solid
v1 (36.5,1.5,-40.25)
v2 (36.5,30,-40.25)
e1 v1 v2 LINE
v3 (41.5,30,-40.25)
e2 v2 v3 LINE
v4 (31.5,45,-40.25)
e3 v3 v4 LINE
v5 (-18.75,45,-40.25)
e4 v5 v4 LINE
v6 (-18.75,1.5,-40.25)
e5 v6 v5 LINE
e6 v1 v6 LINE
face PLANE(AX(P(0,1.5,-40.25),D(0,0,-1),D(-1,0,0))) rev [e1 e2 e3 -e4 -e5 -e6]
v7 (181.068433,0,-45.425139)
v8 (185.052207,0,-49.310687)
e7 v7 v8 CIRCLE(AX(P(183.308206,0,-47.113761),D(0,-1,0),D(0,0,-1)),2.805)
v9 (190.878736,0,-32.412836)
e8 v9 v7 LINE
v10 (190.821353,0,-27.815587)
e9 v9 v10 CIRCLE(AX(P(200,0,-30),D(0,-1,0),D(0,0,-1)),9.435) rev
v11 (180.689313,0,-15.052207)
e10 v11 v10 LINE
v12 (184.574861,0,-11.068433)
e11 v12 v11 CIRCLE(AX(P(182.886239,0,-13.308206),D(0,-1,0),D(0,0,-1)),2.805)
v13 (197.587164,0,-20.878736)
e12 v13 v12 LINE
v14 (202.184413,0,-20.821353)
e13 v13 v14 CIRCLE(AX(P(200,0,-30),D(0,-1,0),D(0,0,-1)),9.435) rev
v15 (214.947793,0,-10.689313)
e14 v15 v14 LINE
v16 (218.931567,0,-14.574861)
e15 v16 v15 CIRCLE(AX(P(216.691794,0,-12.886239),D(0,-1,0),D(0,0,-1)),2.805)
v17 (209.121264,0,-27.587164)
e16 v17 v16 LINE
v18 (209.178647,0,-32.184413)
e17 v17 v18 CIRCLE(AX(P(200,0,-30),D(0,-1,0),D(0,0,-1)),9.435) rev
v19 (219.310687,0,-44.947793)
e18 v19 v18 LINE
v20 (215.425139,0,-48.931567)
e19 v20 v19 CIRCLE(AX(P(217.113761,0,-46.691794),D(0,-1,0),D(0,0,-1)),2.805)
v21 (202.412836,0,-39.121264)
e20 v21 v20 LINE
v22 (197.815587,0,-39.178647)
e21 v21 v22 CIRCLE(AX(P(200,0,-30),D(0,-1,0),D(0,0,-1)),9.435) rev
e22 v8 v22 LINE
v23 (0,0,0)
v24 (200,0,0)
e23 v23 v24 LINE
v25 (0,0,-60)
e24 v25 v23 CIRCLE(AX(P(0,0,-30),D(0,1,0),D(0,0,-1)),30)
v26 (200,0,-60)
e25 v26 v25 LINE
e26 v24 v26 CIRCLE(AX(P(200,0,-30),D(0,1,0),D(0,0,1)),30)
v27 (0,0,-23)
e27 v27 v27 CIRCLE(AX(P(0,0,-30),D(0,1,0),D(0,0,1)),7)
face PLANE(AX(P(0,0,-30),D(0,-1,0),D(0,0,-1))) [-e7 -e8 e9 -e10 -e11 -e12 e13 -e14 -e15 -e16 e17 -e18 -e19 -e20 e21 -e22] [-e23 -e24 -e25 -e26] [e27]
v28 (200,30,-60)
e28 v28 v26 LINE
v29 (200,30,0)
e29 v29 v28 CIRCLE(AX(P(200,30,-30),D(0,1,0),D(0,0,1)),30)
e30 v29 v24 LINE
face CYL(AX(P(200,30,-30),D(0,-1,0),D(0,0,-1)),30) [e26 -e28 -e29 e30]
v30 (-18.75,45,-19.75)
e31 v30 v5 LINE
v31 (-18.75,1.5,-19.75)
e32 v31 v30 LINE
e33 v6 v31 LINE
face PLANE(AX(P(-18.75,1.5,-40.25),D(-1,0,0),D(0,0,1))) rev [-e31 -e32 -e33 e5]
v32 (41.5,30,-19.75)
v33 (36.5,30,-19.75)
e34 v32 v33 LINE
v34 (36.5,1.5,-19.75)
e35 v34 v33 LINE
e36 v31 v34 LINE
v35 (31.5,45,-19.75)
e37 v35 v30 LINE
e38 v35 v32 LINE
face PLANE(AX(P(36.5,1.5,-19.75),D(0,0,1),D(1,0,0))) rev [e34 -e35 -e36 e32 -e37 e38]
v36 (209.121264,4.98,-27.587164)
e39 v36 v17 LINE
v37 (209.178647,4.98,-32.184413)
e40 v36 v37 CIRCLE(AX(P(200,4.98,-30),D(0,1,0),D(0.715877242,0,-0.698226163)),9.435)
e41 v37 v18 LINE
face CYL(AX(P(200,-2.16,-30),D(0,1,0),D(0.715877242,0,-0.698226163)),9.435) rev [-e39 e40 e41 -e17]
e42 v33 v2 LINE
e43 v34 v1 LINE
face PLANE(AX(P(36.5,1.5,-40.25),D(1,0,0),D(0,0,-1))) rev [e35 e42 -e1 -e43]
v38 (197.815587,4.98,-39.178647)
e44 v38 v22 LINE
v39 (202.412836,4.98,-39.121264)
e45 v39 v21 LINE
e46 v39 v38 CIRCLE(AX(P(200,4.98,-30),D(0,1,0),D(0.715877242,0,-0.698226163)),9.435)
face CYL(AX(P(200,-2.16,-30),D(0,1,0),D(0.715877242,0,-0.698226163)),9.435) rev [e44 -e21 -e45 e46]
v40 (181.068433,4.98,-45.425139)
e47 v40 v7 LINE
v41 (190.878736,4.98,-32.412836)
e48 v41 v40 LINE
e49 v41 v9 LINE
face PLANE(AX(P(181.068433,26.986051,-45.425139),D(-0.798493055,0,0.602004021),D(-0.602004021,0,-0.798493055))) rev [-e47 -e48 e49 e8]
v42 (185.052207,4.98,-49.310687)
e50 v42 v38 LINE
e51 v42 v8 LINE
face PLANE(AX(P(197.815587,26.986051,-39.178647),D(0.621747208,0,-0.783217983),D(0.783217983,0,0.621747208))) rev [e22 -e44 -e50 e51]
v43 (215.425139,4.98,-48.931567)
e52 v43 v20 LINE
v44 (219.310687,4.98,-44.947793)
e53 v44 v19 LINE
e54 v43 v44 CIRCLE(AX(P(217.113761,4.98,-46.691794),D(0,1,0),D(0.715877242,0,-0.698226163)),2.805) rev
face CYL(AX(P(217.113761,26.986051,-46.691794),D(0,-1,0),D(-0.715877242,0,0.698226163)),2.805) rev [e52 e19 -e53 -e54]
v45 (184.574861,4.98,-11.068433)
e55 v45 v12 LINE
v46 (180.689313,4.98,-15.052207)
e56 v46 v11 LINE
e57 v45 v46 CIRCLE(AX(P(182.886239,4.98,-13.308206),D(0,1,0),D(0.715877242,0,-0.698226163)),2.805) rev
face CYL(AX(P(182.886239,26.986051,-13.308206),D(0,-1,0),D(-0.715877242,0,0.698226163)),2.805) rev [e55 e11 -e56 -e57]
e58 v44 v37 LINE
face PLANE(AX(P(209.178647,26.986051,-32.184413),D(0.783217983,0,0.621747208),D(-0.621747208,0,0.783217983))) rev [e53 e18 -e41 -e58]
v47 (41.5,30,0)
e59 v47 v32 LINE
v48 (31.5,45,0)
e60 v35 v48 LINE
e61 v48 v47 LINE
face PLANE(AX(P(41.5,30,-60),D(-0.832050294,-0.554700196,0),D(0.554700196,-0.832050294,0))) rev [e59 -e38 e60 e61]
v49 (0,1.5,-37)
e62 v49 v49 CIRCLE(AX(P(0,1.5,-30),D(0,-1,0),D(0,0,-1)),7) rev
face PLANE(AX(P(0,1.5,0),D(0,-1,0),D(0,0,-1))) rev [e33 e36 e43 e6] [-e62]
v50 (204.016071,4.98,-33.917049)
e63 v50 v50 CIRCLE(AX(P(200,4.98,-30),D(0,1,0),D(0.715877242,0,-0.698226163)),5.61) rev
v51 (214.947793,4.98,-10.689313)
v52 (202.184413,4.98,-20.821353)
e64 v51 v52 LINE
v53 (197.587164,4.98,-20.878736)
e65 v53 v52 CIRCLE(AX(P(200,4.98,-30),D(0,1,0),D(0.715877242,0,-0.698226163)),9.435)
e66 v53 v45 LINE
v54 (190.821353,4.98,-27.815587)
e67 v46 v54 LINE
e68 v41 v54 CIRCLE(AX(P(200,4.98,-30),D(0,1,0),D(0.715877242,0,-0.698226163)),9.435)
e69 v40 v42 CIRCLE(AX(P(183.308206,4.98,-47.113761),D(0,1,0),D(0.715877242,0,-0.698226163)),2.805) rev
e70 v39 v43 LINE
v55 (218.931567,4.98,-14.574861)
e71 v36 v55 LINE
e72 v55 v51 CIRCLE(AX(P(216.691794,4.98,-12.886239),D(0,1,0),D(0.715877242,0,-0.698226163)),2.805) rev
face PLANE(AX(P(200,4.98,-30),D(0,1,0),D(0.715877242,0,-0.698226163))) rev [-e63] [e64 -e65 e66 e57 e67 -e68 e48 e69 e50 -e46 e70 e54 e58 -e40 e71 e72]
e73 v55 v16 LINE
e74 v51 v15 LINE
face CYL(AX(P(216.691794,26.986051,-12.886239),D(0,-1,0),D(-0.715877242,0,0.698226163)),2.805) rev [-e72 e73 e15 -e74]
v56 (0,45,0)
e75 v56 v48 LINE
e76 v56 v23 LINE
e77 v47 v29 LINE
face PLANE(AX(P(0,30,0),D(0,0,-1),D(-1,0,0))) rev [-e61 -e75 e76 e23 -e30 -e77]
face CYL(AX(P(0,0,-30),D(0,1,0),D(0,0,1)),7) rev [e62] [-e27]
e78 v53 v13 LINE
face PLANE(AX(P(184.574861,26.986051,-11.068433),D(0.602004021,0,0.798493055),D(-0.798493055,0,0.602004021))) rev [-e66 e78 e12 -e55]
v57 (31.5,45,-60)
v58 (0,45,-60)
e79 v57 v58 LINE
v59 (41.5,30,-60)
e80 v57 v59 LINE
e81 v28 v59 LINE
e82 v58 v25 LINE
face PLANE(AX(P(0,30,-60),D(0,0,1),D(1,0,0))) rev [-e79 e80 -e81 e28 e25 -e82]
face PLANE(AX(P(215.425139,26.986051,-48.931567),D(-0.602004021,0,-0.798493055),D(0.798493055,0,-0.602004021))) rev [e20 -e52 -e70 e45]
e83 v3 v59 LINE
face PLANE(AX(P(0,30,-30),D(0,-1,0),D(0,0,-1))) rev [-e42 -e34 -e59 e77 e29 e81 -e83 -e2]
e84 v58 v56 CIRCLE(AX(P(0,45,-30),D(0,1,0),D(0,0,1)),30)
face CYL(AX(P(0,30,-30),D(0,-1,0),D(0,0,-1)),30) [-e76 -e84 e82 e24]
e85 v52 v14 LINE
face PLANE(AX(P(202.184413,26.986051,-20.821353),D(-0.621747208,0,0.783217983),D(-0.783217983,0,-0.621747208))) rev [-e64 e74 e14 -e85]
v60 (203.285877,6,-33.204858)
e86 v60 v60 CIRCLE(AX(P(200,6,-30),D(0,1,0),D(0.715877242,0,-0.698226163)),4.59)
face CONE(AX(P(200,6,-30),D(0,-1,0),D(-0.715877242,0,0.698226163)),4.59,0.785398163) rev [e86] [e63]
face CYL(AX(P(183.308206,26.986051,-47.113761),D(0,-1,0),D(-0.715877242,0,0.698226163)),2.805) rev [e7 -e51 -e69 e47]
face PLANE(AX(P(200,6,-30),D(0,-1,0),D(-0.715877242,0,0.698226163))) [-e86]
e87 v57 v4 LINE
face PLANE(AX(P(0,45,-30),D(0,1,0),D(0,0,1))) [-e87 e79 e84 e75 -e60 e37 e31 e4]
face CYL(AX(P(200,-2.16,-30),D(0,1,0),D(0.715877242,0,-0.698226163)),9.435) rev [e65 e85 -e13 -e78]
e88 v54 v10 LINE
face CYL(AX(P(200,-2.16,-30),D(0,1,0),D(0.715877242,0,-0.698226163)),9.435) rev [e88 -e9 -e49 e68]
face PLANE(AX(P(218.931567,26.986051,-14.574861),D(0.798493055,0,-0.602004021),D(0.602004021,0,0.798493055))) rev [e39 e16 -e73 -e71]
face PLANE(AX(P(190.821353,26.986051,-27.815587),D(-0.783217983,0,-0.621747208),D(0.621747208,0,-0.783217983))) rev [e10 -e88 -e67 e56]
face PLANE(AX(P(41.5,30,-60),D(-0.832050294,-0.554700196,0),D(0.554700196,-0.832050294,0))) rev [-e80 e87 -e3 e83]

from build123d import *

# Parameters (mm, degrees)
BOSS_EXTRUDE1_DEPTH = 30
SKETCH2_R           = 7
CUT_EXTRUDE1_DEPTH  = 240.582971014
CUT_EXTRUDE2_DEPTH  = 28.5
BOSS_EXTRUDE2_DEPTH = 15
CUT_EXTRUDE3_DEPTH  = 242.919408068
CAVITY1_START       = -1
CAVITY1_OUTLINE_R   = 1.02
CAVITY1_DEPTH       = 5.98
CAVITY1_START_2     = 2.94
CAVITY1_2_OUTLINE_R = 1.683
CAVITY1_2_DEPTH     = 2.04
CAVITY1_START_3     = 4.98
CAVITY1_3_OUTLINE_R = 2.805
CAVITY1_3_DEPTH     = 1.02
SKETCH6_R           = 1.02
SKETCH6_R_2         = 5.61
CUT_EXTRUDE4_DEPTH  = 4.98
CUT_EXTRUDE5_START  = -1.02
SKETCH7_R           = 2.805
CUT_EXTRUDE5_DEPTH  = 1.02


with BuildPart() as part:
    # Sketch1 → Boss-Extrude1 (new body)
    with BuildSketch(Plane(origin=(0, 0, 0), x_dir=(1, 0, 0), z_dir=(0, 1, 0))):
        with BuildLine():
            Line((0, 0), (200, 0))
            ThreePointArc((200, 0), (230, 30), (200, 60))
            Line((200, 60), (0, 60))
            ThreePointArc((0, 60), (-30, 30), (0, 0))
        make_face()
    extrude(amount=BOSS_EXTRUDE1_DEPTH)

    # Sketch2 → Cut-Extrude1 (cut, through all)
    with BuildSketch(Plane(origin=(0, 30, 0), x_dir=(1, 0, 0), z_dir=(0, 1, 0))):
        with Locations(Location((0, 30, 0), (0, 0, 270))):
            Circle(SKETCH2_R)
    extrude(amount=-CUT_EXTRUDE1_DEPTH, mode=Mode.SUBTRACT)

    # Sketch3 → Cut-Extrude2 (cut)
    with BuildSketch(Plane(origin=(0, 30, 0), x_dir=(1, 0, 0), z_dir=(0, 1, 0))):
        Polygon((-18.75, 40.25), (-18.75, 19.75), (0, 19.75), (36.5, 19.75), (36.5, 40.25), (0, 40.25), align=None)
    extrude(amount=-CUT_EXTRUDE2_DEPTH, mode=Mode.SUBTRACT)

    # Sketch4 → Boss-Extrude2 (add)
    with BuildSketch(Plane(origin=(0, 30, 0), x_dir=(1, 0, 0), z_dir=(0, 1, 0))):
        with BuildLine():
            Line((-18.75, 40.25), (41.5, 40.25))
            Line((41.5, 40.25), (41.5, 60))
            Line((41.5, 60), (0, 60))
            ThreePointArc((0, 60), (-30, 30), (0, 0))
            Line((0, 0), (41.5, 0))
            Line((41.5, 0), (41.5, 19.75))
            Line((41.5, 19.75), (-18.75, 19.75))
            Line((-18.75, 19.75), (-18.75, 40.25))
        make_face()
    extrude(amount=BOSS_EXTRUDE2_DEPTH)

    # Sketch5 → Cut-Extrude3 (cut, through all)
    with BuildSketch(Plane.XY):
        Polygon((31.5, 45), (41.5, 45), (41.5, 30), align=None)
    extrude(amount=-CUT_EXTRUDE3_DEPTH, mode=Mode.SUBTRACT)

    # Cavity1: read off the stored shape, not the designer's step
    # Cavity1 outline → Cavity1 (cut)
    with BuildSketch(Plane(origin=(0, 0, 0), x_dir=(1, 0, 0), z_dir=(0, 1, 0)).offset(CAVITY1_START)):
        with BuildLine():
            Line((215.425139365, 48.931566971), (202.412835688, 39.121263561))
            ThreePointArc((202.412835688, 39.121263561), (200.117760104, 39.434265078), (197.815586916, 39.178647203))
            Line((197.815586916, 39.178647203), (185.052206965, 49.310687088))
            ThreePointArc((185.052206965, 49.310687088), (181.349681661, 49.121796309), (181.068433029, 45.425139365))
            Line((181.068433029, 45.425139365), (190.878736439, 32.412835688))
            ThreePointArc((190.878736439, 32.412835688), (190.565734922, 30.117760104), (190.821352797, 27.815586916))
            Line((190.821352797, 27.815586916), (180.689312912, 15.052206965))
            ThreePointArc((180.689312912, 15.052206965), (180.878203691, 11.349681661), (184.574860635, 11.068433029))
            Line((184.574860635, 11.068433029), (197.587164312, 20.878736439))
            ThreePointArc((197.587164312, 20.878736439), (199.882239896, 20.565734922), (202.184413084, 20.821352797))
            Line((202.184413084, 20.821352797), (214.947793035, 10.689312912))
            ThreePointArc((214.947793035, 10.689312912), (218.650318339, 10.878203691), (218.931566971, 14.574860635))
            Line((218.931566971, 14.574860635), (209.121263561, 27.587164312))
            ThreePointArc((209.121263561, 27.587164312), (209.434265078, 29.882239896), (209.178647203, 32.184413084))
            Line((209.178647203, 32.184413084), (219.310687088, 44.947793035))
            ThreePointArc((219.310687088, 44.947793035), (219.121796309, 48.650318339), (215.425139365, 48.931566971))
        make_face()
        with Locations((183.022971201, 13.441566555)):
            Circle(CAVITY1_OUTLINE_R, mode=Mode.SUBTRACT)
        with Locations((186.673945136, 17.002519984)):
            Circle(CAVITY1_OUTLINE_R, mode=Mode.SUBTRACT)
        with Locations((190.324919072, 20.563473413)):
            Circle(CAVITY1_OUTLINE_R, mode=Mode.SUBTRACT)
        with Locations((193.975893007, 24.124426842)):
            Circle(CAVITY1_OUTLINE_R, mode=Mode.SUBTRACT)
        with Locations((216.558433445, 13.022971201)):
            Circle(CAVITY1_OUTLINE_R, mode=Mode.SUBTRACT)
        with Locations((212.997480016, 16.673945136)):
            Circle(CAVITY1_OUTLINE_R, mode=Mode.SUBTRACT)
        with Locations((209.436526587, 20.324919072)):
            Circle(CAVITY1_OUTLINE_R, mode=Mode.SUBTRACT)
        with Locations((205.875573158, 23.975893007)):
            Circle(CAVITY1_OUTLINE_R, mode=Mode.SUBTRACT)
        with Locations((194.124426842, 36.024106993)):
            Circle(CAVITY1_OUTLINE_R, mode=Mode.SUBTRACT)
        with Locations((190.563473413, 39.675080928)):
            Circle(CAVITY1_OUTLINE_R, mode=Mode.SUBTRACT)
        with Locations((187.002519984, 43.326054864)):
            Circle(CAVITY1_OUTLINE_R, mode=Mode.SUBTRACT)
        with Locations((183.441566555, 46.977028799)):
            Circle(CAVITY1_OUTLINE_R, mode=Mode.SUBTRACT)
        with BuildLine():
            Line((202.58182093, 32.319782958), (203.124264185, 32.623999486))
            ThreePointArc((203.124264185, 32.623999486), (203.267629631, 32.443153003), (203.400540503, 32.254489806))
            Line((203.400540503, 32.254489806), (202.955317585, 31.82024456))
            Line((202.955317585, 31.82024456), (203.094251525, 31.572513843))
            Line((203.094251525, 31.572513843), (203.696948506, 31.725969798))
            ThreePointArc((203.696948506, 31.725969798), (203.788622379, 31.514179802), (203.868174794, 31.297545283))
            Line((203.868174794, 31.297545283), (203.325731539, 30.993328755))
            Line((203.325731539, 30.993328755), (203.395813992, 30.718080508))
            Line((203.395813992, 30.718080508), (204.017691895, 30.710318122))
            ThreePointArc((204.017691895, 30.710318122), (204.051426772, 30.48201775), (204.072199365, 30.252175193))
            Line((204.072199365, 30.252175193), (203.469502385, 30.098719237))
            Line((203.469502385, 30.098719237), (203.465957348, 29.814711173))
            Line((203.465957348, 29.814711173), (204.064636222, 29.646259439))
            ThreePointArc((204.064636222, 29.646259439), (204.038133126, 29.417006985), (203.99871028, 29.189619781))
            Line((203.99871028, 29.189619781), (203.376832377, 29.197382167))
            Line((203.376832377, 29.197382167), (203.299901438, 28.923968965))
            Line((203.299901438, 28.923968965), (203.834582307, 28.60630759))
            ThreePointArc((203.834582307, 28.60630759), (203.749647381, 28.391726231), (203.652715696, 28.182290441))
            Line((203.652715696, 28.182290441), (203.054036822, 28.350742175))
            Line((203.054036822, 28.350742175), (202.908962698, 28.106556495))
            Line((202.908962698, 28.106556495), (203.343207945, 27.661333577))
            ThreePointArc((203.343207945, 27.661333577), (203.205629364, 27.476046676), (203.057794575, 27.298835003))
            Line((203.057794575, 27.298835003), (202.523113706, 27.616496378))
            Line((202.523113706, 27.616496378), (202.319782958, 27.41817907))
            Line((202.319782958, 27.41817907), (202.623999486, 26.875735815))
            ThreePointArc((202.623999486, 26.875735815), (202.443153003, 26.732370369), (202.254489806, 26.599459497))
            Line((202.254489806, 26.599459497), (201.82024456, 27.044682415))
            Line((201.82024456, 27.044682415), (201.572513843, 26.905748475))
            Line((201.572513843, 26.905748475), (201.725969798, 26.303051494))
            ThreePointArc((201.725969798, 26.303051494), (201.514179802, 26.211377621), (201.297545283, 26.131825206))
            Line((201.297545283, 26.131825206), (200.993328755, 26.674268461))
            Line((200.993328755, 26.674268461), (200.718080508, 26.604186008))
            Line((200.718080508, 26.604186008), (200.710318122, 25.982308105))
            ThreePointArc((200.710318122, 25.982308105), (200.48201775, 25.948573228), (200.252175193, 25.927800635))
            Line((200.252175193, 25.927800635), (200.098719237, 26.530497615))
            Line((200.098719237, 26.530497615), (199.814711173, 26.534042652))
            Line((199.814711173, 26.534042652), (199.646259439, 25.935363778))
            ThreePointArc((199.646259439, 25.935363778), (199.417006985, 25.961866874), (199.189619781, 26.00128972))
            Line((199.189619781, 26.00128972), (199.197382167, 26.623167623))
            Line((199.197382167, 26.623167623), (198.923968965, 26.700098562))
            Line((198.923968965, 26.700098562), (198.60630759, 26.165417693))
            ThreePointArc((198.60630759, 26.165417693), (198.391726231, 26.250352619), (198.182290441, 26.347284304))
            Line((198.182290441, 26.347284304), (198.350742175, 26.945963178))
            Line((198.350742175, 26.945963178), (198.106556495, 27.091037302))
            Line((198.106556495, 27.091037302), (197.661333577, 26.656792055))
            ThreePointArc((197.661333577, 26.656792055), (197.476046676, 26.794370636), (197.298835003, 26.942205425))
            Line((197.298835003, 26.942205425), (197.616496378, 27.476886294))
            Line((197.616496378, 27.476886294), (197.41817907, 27.680217042))
            Line((197.41817907, 27.680217042), (196.875735815, 27.376000514))
            ThreePointArc((196.875735815, 27.376000514), (196.732370369, 27.556846997), (196.599459497, 27.745510194))
            Line((196.599459497, 27.745510194), (197.044682415, 28.17975544))
            Line((197.044682415, 28.17975544), (196.905748475, 28.427486157))
            Line((196.905748475, 28.427486157), (196.303051494, 28.274030202))
            ThreePointArc((196.303051494, 28.274030202), (196.211377621, 28.485820198), (196.131825206, 28.702454717))
            Line((196.131825206, 28.702454717), (196.674268461, 29.006671245))
            Line((196.674268461, 29.006671245), (196.604186008, 29.281919492))
            Line((196.604186008, 29.281919492), (195.982308105, 29.289681878))
            ThreePointArc((195.982308105, 29.289681878), (195.948573228, 29.51798225), (195.927800635, 29.747824807))
            Line((195.927800635, 29.747824807), (196.530497615, 29.901280763))
            Line((196.530497615, 29.901280763), (196.534042652, 30.185288827))
            Line((196.534042652, 30.185288827), (195.935363778, 30.353740561))
            ThreePointArc((195.935363778, 30.353740561), (195.961866874, 30.582993015), (196.00128972, 30.810380219))
            Line((196.00128972, 30.810380219), (196.623167623, 30.802617833))
            Line((196.623167623, 30.802617833), (196.700098562, 31.076031035))
            Line((196.700098562, 31.076031035), (196.165417693, 31.39369241))
            ThreePointArc((196.165417693, 31.39369241), (196.250352619, 31.608273769), (196.347284304, 31.817709559))
            Line((196.347284304, 31.817709559), (196.945963178, 31.649257825))
            Line((196.945963178, 31.649257825), (197.091037302, 31.893443505))
            Line((197.091037302, 31.893443505), (196.656792055, 32.338666423))
            ThreePointArc((196.656792055, 32.338666423), (196.794370636, 32.523953324), (196.942205425, 32.701164997))
            Line((196.942205425, 32.701164997), (197.476886294, 32.383503622))
            Line((197.476886294, 32.383503622), (197.680217042, 32.58182093))
            Line((197.680217042, 32.58182093), (197.376000514, 33.124264185))
            ThreePointArc((197.376000514, 33.124264185), (197.556846997, 33.267629631), (197.745510194, 33.400540503))
            Line((197.745510194, 33.400540503), (198.17975544, 32.955317585))
            Line((198.17975544, 32.955317585), (198.427486157, 33.094251525))
            Line((198.427486157, 33.094251525), (198.274030202, 33.696948506))
            ThreePointArc((198.274030202, 33.696948506), (198.485820198, 33.788622379), (198.702454717, 33.868174794))
            Line((198.702454717, 33.868174794), (199.006671245, 33.325731539))
            Line((199.006671245, 33.325731539), (199.281919492, 33.395813992))
            Line((199.281919492, 33.395813992), (199.289681878, 34.017691895))
            ThreePointArc((199.289681878, 34.017691895), (199.51798225, 34.051426772), (199.747824807, 34.072199365))
            Line((199.747824807, 34.072199365), (199.901280763, 33.469502385))
            Line((199.901280763, 33.469502385), (200.185288827, 33.465957348))
            Line((200.185288827, 33.465957348), (200.353740561, 34.064636222))
            ThreePointArc((200.353740561, 34.064636222), (200.582993015, 34.038133126), (200.810380219, 33.99871028))
            Line((200.810380219, 33.99871028), (200.802617833, 33.376832377))
            Line((200.802617833, 33.376832377), (201.076031035, 33.299901438))
            Line((201.076031035, 33.299901438), (201.39369241, 33.834582307))
            ThreePointArc((201.39369241, 33.834582307), (201.608273769, 33.749647381), (201.817709559, 33.652715696))
            Line((201.817709559, 33.652715696), (201.649257825, 33.054036822))
            Line((201.649257825, 33.054036822), (201.893443505, 32.908962698))
            Line((201.893443505, 32.908962698), (202.338666423, 33.343207945))
            ThreePointArc((202.338666423, 33.343207945), (202.523953324, 33.205629364), (202.701164997, 33.057794575))
            Line((202.701164997, 33.057794575), (202.383503622, 32.523113706))
            Line((202.383503622, 32.523113706), (202.58182093, 32.319782958))
        make_face(mode=Mode.SUBTRACT)
        with Locations((206.024106993, 35.875573158)):
            Circle(CAVITY1_OUTLINE_R, mode=Mode.SUBTRACT)
        with Locations((209.675080928, 39.436526587)):
            Circle(CAVITY1_OUTLINE_R, mode=Mode.SUBTRACT)
        with Locations((213.326054864, 42.997480016)):
            Circle(CAVITY1_OUTLINE_R, mode=Mode.SUBTRACT)
        with Locations((216.977028799, 46.558433445)):
            Circle(CAVITY1_OUTLINE_R, mode=Mode.SUBTRACT)
    extrude(amount=CAVITY1_DEPTH, mode=Mode.SUBTRACT)

    # Cavity1 2 outline → Cavity1 2 (cut)
    with BuildSketch(Plane(origin=(0, 0, 0), x_dir=(1, 0, 0), z_dir=(0, 1, 0)).offset(CAVITY1_START_2)):
        with BuildLine():
            ThreePointArc((203.400540503, 32.254489806), (203.267629631, 32.443153003), (203.124264185, 32.623999486))
            Line((203.124264185, 32.623999486), (202.58182093, 32.319782958))
            Line((202.58182093, 32.319782958), (202.383503622, 32.523113706))
            Line((202.383503622, 32.523113706), (202.701164997, 33.057794575))
            ThreePointArc((202.701164997, 33.057794575), (202.523953324, 33.205629364), (202.338666423, 33.343207945))
            Line((202.338666423, 33.343207945), (201.893443505, 32.908962698))
            Line((201.893443505, 32.908962698), (201.649257825, 33.054036822))
            Line((201.649257825, 33.054036822), (201.817709559, 33.652715696))
            ThreePointArc((201.817709559, 33.652715696), (201.608273769, 33.749647381), (201.39369241, 33.834582307))
            Line((201.39369241, 33.834582307), (201.076031035, 33.299901438))
            Line((201.076031035, 33.299901438), (200.802617833, 33.376832377))
            Line((200.802617833, 33.376832377), (200.810380219, 33.99871028))
            ThreePointArc((200.810380219, 33.99871028), (200.582993015, 34.038133126), (200.353740561, 34.064636222))
            Line((200.353740561, 34.064636222), (200.185288827, 33.465957348))
            Line((200.185288827, 33.465957348), (199.901280763, 33.469502385))
            Line((199.901280763, 33.469502385), (199.747824807, 34.072199365))
            ThreePointArc((199.747824807, 34.072199365), (199.51798225, 34.051426772), (199.289681878, 34.017691895))
            Line((199.289681878, 34.017691895), (199.281919492, 33.395813992))
            Line((199.281919492, 33.395813992), (199.006671245, 33.325731539))
            Line((199.006671245, 33.325731539), (198.702454717, 33.868174794))
            ThreePointArc((198.702454717, 33.868174794), (198.485820198, 33.788622379), (198.274030202, 33.696948506))
            Line((198.274030202, 33.696948506), (198.427486157, 33.094251525))
            Line((198.427486157, 33.094251525), (198.17975544, 32.955317585))
            Line((198.17975544, 32.955317585), (197.745510194, 33.400540503))
            ThreePointArc((197.745510194, 33.400540503), (197.556846997, 33.267629631), (197.376000514, 33.124264185))
            Line((197.376000514, 33.124264185), (197.680217042, 32.58182093))
            Line((197.680217042, 32.58182093), (197.476886294, 32.383503622))
            Line((197.476886294, 32.383503622), (196.942205425, 32.701164997))
            ThreePointArc((196.942205425, 32.701164997), (196.794370636, 32.523953324), (196.656792055, 32.338666423))
            Line((196.656792055, 32.338666423), (197.091037302, 31.893443505))
            Line((197.091037302, 31.893443505), (196.945963178, 31.649257825))
            Line((196.945963178, 31.649257825), (196.347284304, 31.817709559))
            ThreePointArc((196.347284304, 31.817709559), (196.250352619, 31.608273769), (196.165417693, 31.39369241))
            Line((196.165417693, 31.39369241), (196.700098562, 31.076031035))
            Line((196.700098562, 31.076031035), (196.623167623, 30.802617833))
            Line((196.623167623, 30.802617833), (196.00128972, 30.810380219))
            ThreePointArc((196.00128972, 30.810380219), (195.961866874, 30.582993015), (195.935363778, 30.353740561))
            Line((195.935363778, 30.353740561), (196.534042652, 30.185288827))
            Line((196.534042652, 30.185288827), (196.530497615, 29.901280763))
            Line((196.530497615, 29.901280763), (195.927800635, 29.747824807))
            ThreePointArc((195.927800635, 29.747824807), (195.948573228, 29.51798225), (195.982308105, 29.289681878))
            Line((195.982308105, 29.289681878), (196.604186008, 29.281919492))
            Line((196.604186008, 29.281919492), (196.674268461, 29.006671245))
            Line((196.674268461, 29.006671245), (196.131825206, 28.702454717))
            ThreePointArc((196.131825206, 28.702454717), (196.211377621, 28.485820198), (196.303051494, 28.274030202))
            Line((196.303051494, 28.274030202), (196.905748475, 28.427486157))
            Line((196.905748475, 28.427486157), (197.044682415, 28.17975544))
            Line((197.044682415, 28.17975544), (196.599459497, 27.745510194))
            ThreePointArc((196.599459497, 27.745510194), (196.732370369, 27.556846997), (196.875735815, 27.376000514))
            Line((196.875735815, 27.376000514), (197.41817907, 27.680217042))
            Line((197.41817907, 27.680217042), (197.616496378, 27.476886294))
            Line((197.616496378, 27.476886294), (197.298835003, 26.942205425))
            ThreePointArc((197.298835003, 26.942205425), (197.476046676, 26.794370636), (197.661333577, 26.656792055))
            Line((197.661333577, 26.656792055), (198.106556495, 27.091037302))
            Line((198.106556495, 27.091037302), (198.350742175, 26.945963178))
            Line((198.350742175, 26.945963178), (198.182290441, 26.347284304))
            ThreePointArc((198.182290441, 26.347284304), (198.391726231, 26.250352619), (198.60630759, 26.165417693))
            Line((198.60630759, 26.165417693), (198.923968965, 26.700098562))
            Line((198.923968965, 26.700098562), (199.197382167, 26.623167623))
            Line((199.197382167, 26.623167623), (199.189619781, 26.00128972))
            ThreePointArc((199.189619781, 26.00128972), (199.417006985, 25.961866874), (199.646259439, 25.935363778))
            Line((199.646259439, 25.935363778), (199.814711173, 26.534042652))
            Line((199.814711173, 26.534042652), (200.098719237, 26.530497615))
            Line((200.098719237, 26.530497615), (200.252175193, 25.927800635))
            ThreePointArc((200.252175193, 25.927800635), (200.48201775, 25.948573228), (200.710318122, 25.982308105))
            Line((200.710318122, 25.982308105), (200.718080508, 26.604186008))
            Line((200.718080508, 26.604186008), (200.993328755, 26.674268461))
            Line((200.993328755, 26.674268461), (201.297545283, 26.131825206))
            ThreePointArc((201.297545283, 26.131825206), (201.514179802, 26.211377621), (201.725969798, 26.303051494))
            Line((201.725969798, 26.303051494), (201.572513843, 26.905748475))
            Line((201.572513843, 26.905748475), (201.82024456, 27.044682415))
            Line((201.82024456, 27.044682415), (202.254489806, 26.599459497))
            ThreePointArc((202.254489806, 26.599459497), (202.443153003, 26.732370369), (202.623999486, 26.875735815))
            Line((202.623999486, 26.875735815), (202.319782958, 27.41817907))
            Line((202.319782958, 27.41817907), (202.523113706, 27.616496378))
            Line((202.523113706, 27.616496378), (203.057794575, 27.298835003))
            ThreePointArc((203.057794575, 27.298835003), (203.205629364, 27.476046676), (203.343207945, 27.661333577))
            Line((203.343207945, 27.661333577), (202.908962698, 28.106556495))
            Line((202.908962698, 28.106556495), (203.054036822, 28.350742175))
            Line((203.054036822, 28.350742175), (203.652715696, 28.182290441))
            ThreePointArc((203.652715696, 28.182290441), (203.749647381, 28.391726231), (203.834582307, 28.60630759))
            Line((203.834582307, 28.60630759), (203.299901438, 28.923968965))
            Line((203.299901438, 28.923968965), (203.376832377, 29.197382167))
            Line((203.376832377, 29.197382167), (203.99871028, 29.189619781))
            ThreePointArc((203.99871028, 29.189619781), (204.038133126, 29.417006985), (204.064636222, 29.646259439))
            Line((204.064636222, 29.646259439), (203.465957348, 29.814711173))
            Line((203.465957348, 29.814711173), (203.469502385, 30.098719237))
            Line((203.469502385, 30.098719237), (204.072199365, 30.252175193))
            ThreePointArc((204.072199365, 30.252175193), (204.051426772, 30.48201775), (204.017691895, 30.710318122))
            Line((204.017691895, 30.710318122), (203.395813992, 30.718080508))
            Line((203.395813992, 30.718080508), (203.325731539, 30.993328755))
            Line((203.325731539, 30.993328755), (203.868174794, 31.297545283))
            ThreePointArc((203.868174794, 31.297545283), (203.788622379, 31.514179802), (203.696948506, 31.725969798))
            Line((203.696948506, 31.725969798), (203.094251525, 31.572513843))
            Line((203.094251525, 31.572513843), (202.955317585, 31.82024456))
            Line((202.955317585, 31.82024456), (203.400540503, 32.254489806))
        make_face()
        with Locations((200, 30)):
            Circle(CAVITY1_2_OUTLINE_R, mode=Mode.SUBTRACT)
    extrude(amount=CAVITY1_2_DEPTH, mode=Mode.SUBTRACT)

    # Cavity1 3 outline → Cavity1 3 (cut)
    with BuildSketch(Plane(origin=(0, 0, 0), x_dir=(1, 0, 0), z_dir=(0, 1, 0)).offset(CAVITY1_START_3)):
        with BuildLine():
            ThreePointArc((203.400540503, 32.254489806), (203.267629631, 32.443153003), (203.124264185, 32.623999486))
            Line((203.124264185, 32.623999486), (202.58182093, 32.319782958))
            Line((202.58182093, 32.319782958), (202.383503622, 32.523113706))
            Line((202.383503622, 32.523113706), (202.701164997, 33.057794575))
            ThreePointArc((202.701164997, 33.057794575), (202.523953324, 33.205629364), (202.338666423, 33.343207945))
            Line((202.338666423, 33.343207945), (201.893443505, 32.908962698))
            Line((201.893443505, 32.908962698), (201.649257825, 33.054036822))
            Line((201.649257825, 33.054036822), (201.817709559, 33.652715696))
            ThreePointArc((201.817709559, 33.652715696), (201.608273769, 33.749647381), (201.39369241, 33.834582307))
            Line((201.39369241, 33.834582307), (201.076031035, 33.299901438))
            Line((201.076031035, 33.299901438), (200.802617833, 33.376832377))
            Line((200.802617833, 33.376832377), (200.810380219, 33.99871028))
            ThreePointArc((200.810380219, 33.99871028), (200.582993015, 34.038133126), (200.353740561, 34.064636222))
            Line((200.353740561, 34.064636222), (200.185288827, 33.465957348))
            Line((200.185288827, 33.465957348), (199.901280763, 33.469502385))
            Line((199.901280763, 33.469502385), (199.747824807, 34.072199365))
            ThreePointArc((199.747824807, 34.072199365), (199.51798225, 34.051426772), (199.289681878, 34.017691895))
            Line((199.289681878, 34.017691895), (199.281919492, 33.395813992))
            Line((199.281919492, 33.395813992), (199.006671245, 33.325731539))
            Line((199.006671245, 33.325731539), (198.702454717, 33.868174794))
            ThreePointArc((198.702454717, 33.868174794), (198.485820198, 33.788622379), (198.274030202, 33.696948506))
            Line((198.274030202, 33.696948506), (198.427486157, 33.094251525))
            Line((198.427486157, 33.094251525), (198.17975544, 32.955317585))
            Line((198.17975544, 32.955317585), (197.745510194, 33.400540503))
            ThreePointArc((197.745510194, 33.400540503), (197.556846997, 33.267629631), (197.376000514, 33.124264185))
            Line((197.376000514, 33.124264185), (197.680217042, 32.58182093))
            Line((197.680217042, 32.58182093), (197.476886294, 32.383503622))
            Line((197.476886294, 32.383503622), (196.942205425, 32.701164997))
            ThreePointArc((196.942205425, 32.701164997), (196.794370636, 32.523953324), (196.656792055, 32.338666423))
            Line((196.656792055, 32.338666423), (197.091037302, 31.893443505))
            Line((197.091037302, 31.893443505), (196.945963178, 31.649257825))
            Line((196.945963178, 31.649257825), (196.347284304, 31.817709559))
            ThreePointArc((196.347284304, 31.817709559), (196.250352619, 31.608273769), (196.165417693, 31.39369241))
            Line((196.165417693, 31.39369241), (196.700098562, 31.076031035))
            Line((196.700098562, 31.076031035), (196.623167623, 30.802617833))
            Line((196.623167623, 30.802617833), (196.00128972, 30.810380219))
            ThreePointArc((196.00128972, 30.810380219), (195.961866874, 30.582993015), (195.935363778, 30.353740561))
            Line((195.935363778, 30.353740561), (196.534042652, 30.185288827))
            Line((196.534042652, 30.185288827), (196.530497615, 29.901280763))
            Line((196.530497615, 29.901280763), (195.927800635, 29.747824807))
            ThreePointArc((195.927800635, 29.747824807), (195.948573228, 29.51798225), (195.982308105, 29.289681878))
            Line((195.982308105, 29.289681878), (196.604186008, 29.281919492))
            Line((196.604186008, 29.281919492), (196.674268461, 29.006671245))
            Line((196.674268461, 29.006671245), (196.131825206, 28.702454717))
            ThreePointArc((196.131825206, 28.702454717), (196.211377621, 28.485820198), (196.303051494, 28.274030202))
            Line((196.303051494, 28.274030202), (196.905748475, 28.427486157))
            Line((196.905748475, 28.427486157), (197.044682415, 28.17975544))
            Line((197.044682415, 28.17975544), (196.599459497, 27.745510194))
            ThreePointArc((196.599459497, 27.745510194), (196.732370369, 27.556846997), (196.875735815, 27.376000514))
            Line((196.875735815, 27.376000514), (197.41817907, 27.680217042))
            Line((197.41817907, 27.680217042), (197.616496378, 27.476886294))
            Line((197.616496378, 27.476886294), (197.298835003, 26.942205425))
            ThreePointArc((197.298835003, 26.942205425), (197.476046676, 26.794370636), (197.661333577, 26.656792055))
            Line((197.661333577, 26.656792055), (198.106556495, 27.091037302))
            Line((198.106556495, 27.091037302), (198.350742175, 26.945963178))
            Line((198.350742175, 26.945963178), (198.182290441, 26.347284304))
            ThreePointArc((198.182290441, 26.347284304), (198.391726231, 26.250352619), (198.60630759, 26.165417693))
            Line((198.60630759, 26.165417693), (198.923968965, 26.700098562))
            Line((198.923968965, 26.700098562), (199.197382167, 26.623167623))
            Line((199.197382167, 26.623167623), (199.189619781, 26.00128972))
            ThreePointArc((199.189619781, 26.00128972), (199.417006985, 25.961866874), (199.646259439, 25.935363778))
            Line((199.646259439, 25.935363778), (199.814711173, 26.534042652))
            Line((199.814711173, 26.534042652), (200.098719237, 26.530497615))
            Line((200.098719237, 26.530497615), (200.252175193, 25.927800635))
            ThreePointArc((200.252175193, 25.927800635), (200.48201775, 25.948573228), (200.710318122, 25.982308105))
            Line((200.710318122, 25.982308105), (200.718080508, 26.604186008))
            Line((200.718080508, 26.604186008), (200.993328755, 26.674268461))
            Line((200.993328755, 26.674268461), (201.297545283, 26.131825206))
            ThreePointArc((201.297545283, 26.131825206), (201.514179802, 26.211377621), (201.725969798, 26.303051494))
            Line((201.725969798, 26.303051494), (201.572513843, 26.905748475))
            Line((201.572513843, 26.905748475), (201.82024456, 27.044682415))
            Line((201.82024456, 27.044682415), (202.254489806, 26.599459497))
            ThreePointArc((202.254489806, 26.599459497), (202.443153003, 26.732370369), (202.623999486, 26.875735815))
            Line((202.623999486, 26.875735815), (202.319782958, 27.41817907))
            Line((202.319782958, 27.41817907), (202.523113706, 27.616496378))
            Line((202.523113706, 27.616496378), (203.057794575, 27.298835003))
            ThreePointArc((203.057794575, 27.298835003), (203.205629364, 27.476046676), (203.343207945, 27.661333577))
            Line((203.343207945, 27.661333577), (202.908962698, 28.106556495))
            Line((202.908962698, 28.106556495), (203.054036822, 28.350742175))
            Line((203.054036822, 28.350742175), (203.652715696, 28.182290441))
            ThreePointArc((203.652715696, 28.182290441), (203.749647381, 28.391726231), (203.834582307, 28.60630759))
            Line((203.834582307, 28.60630759), (203.299901438, 28.923968965))
            Line((203.299901438, 28.923968965), (203.376832377, 29.197382167))
            Line((203.376832377, 29.197382167), (203.99871028, 29.189619781))
            ThreePointArc((203.99871028, 29.189619781), (204.038133126, 29.417006985), (204.064636222, 29.646259439))
            Line((204.064636222, 29.646259439), (203.465957348, 29.814711173))
            Line((203.465957348, 29.814711173), (203.469502385, 30.098719237))
            Line((203.469502385, 30.098719237), (204.072199365, 30.252175193))
            ThreePointArc((204.072199365, 30.252175193), (204.051426772, 30.48201775), (204.017691895, 30.710318122))
            Line((204.017691895, 30.710318122), (203.395813992, 30.718080508))
            Line((203.395813992, 30.718080508), (203.325731539, 30.993328755))
            Line((203.325731539, 30.993328755), (203.868174794, 31.297545283))
            ThreePointArc((203.868174794, 31.297545283), (203.788622379, 31.514179802), (203.696948506, 31.725969798))
            Line((203.696948506, 31.725969798), (203.094251525, 31.572513843))
            Line((203.094251525, 31.572513843), (202.955317585, 31.82024456))
            Line((202.955317585, 31.82024456), (203.400540503, 32.254489806))
        make_face()
        with Locations((200, 30)):
            Circle(CAVITY1_3_OUTLINE_R, mode=Mode.SUBTRACT)
    extrude(amount=CAVITY1_3_DEPTH, mode=Mode.SUBTRACT)

    # Cavity1 4 outline → Cavity1 4 (revolve, cut)
    with BuildSketch(Plane(origin=(200, 0, -30), x_dir=(1, 0, 0), z_dir=(0, 0, 1))):
        Polygon((2.805, 6), (2.805, 4.98), (5.61, 4.98), (4.59, 6), align=None)
    revolve(axis=Axis((200, 0, -30), (0, 1, 0)), mode=Mode.SUBTRACT)

    # Sketch6 → Cut-Extrude4 (cut)
    with BuildSketch(Plane.XZ):
        with Locations((183.022971201, -13.441566555)):
            Circle(SKETCH6_R)
        with Locations((186.673945136, -17.002519984)):
            Circle(SKETCH6_R)
        with Locations((190.324919072, -20.563473413)):
            Circle(SKETCH6_R)
        with Locations((193.975893007, -24.124426842)):
            Circle(SKETCH6_R)
        with Locations((205.875573158, -23.975893007)):
            Circle(SKETCH6_R)
        with Locations((209.436526587, -20.324919072)):
            Circle(SKETCH6_R)
        with Locations((212.997480016, -16.673945136)):
            Circle(SKETCH6_R)
        with Locations((216.558433445, -13.022971201)):
            Circle(SKETCH6_R)
        with Locations((206.024106993, -35.875573158)):
            Circle(SKETCH6_R)
        with Locations((209.675080928, -39.436526587)):
            Circle(SKETCH6_R)
        with Locations((213.326054864, -42.997480016)):
            Circle(SKETCH6_R)
        with Locations((216.977028799, -46.558433445)):
            Circle(SKETCH6_R)
        with Locations((183.441566555, -46.977028799)):
            Circle(SKETCH6_R)
        with Locations((187.002519984, -43.326054864)):
            Circle(SKETCH6_R)
        with Locations((190.563473413, -39.675080928)):
            Circle(SKETCH6_R)
        with Locations((194.124426842, -36.024106993)):
            Circle(SKETCH6_R)
        with Locations((200, -30)):
            Circle(SKETCH6_R_2)
    extrude(amount=-CUT_EXTRUDE4_DEPTH, mode=Mode.SUBTRACT)

    # Sketch7 → Cut-Extrude5 (cut)
    with BuildSketch(Plane.XZ.offset(-4.98).offset(CUT_EXTRUDE5_START)):
        with Locations((200, -30)):
            Circle(SKETCH7_R)
    extrude(amount=CUT_EXTRUDE5_DEPTH, mode=Mode.SUBTRACT)


solid = part.part
